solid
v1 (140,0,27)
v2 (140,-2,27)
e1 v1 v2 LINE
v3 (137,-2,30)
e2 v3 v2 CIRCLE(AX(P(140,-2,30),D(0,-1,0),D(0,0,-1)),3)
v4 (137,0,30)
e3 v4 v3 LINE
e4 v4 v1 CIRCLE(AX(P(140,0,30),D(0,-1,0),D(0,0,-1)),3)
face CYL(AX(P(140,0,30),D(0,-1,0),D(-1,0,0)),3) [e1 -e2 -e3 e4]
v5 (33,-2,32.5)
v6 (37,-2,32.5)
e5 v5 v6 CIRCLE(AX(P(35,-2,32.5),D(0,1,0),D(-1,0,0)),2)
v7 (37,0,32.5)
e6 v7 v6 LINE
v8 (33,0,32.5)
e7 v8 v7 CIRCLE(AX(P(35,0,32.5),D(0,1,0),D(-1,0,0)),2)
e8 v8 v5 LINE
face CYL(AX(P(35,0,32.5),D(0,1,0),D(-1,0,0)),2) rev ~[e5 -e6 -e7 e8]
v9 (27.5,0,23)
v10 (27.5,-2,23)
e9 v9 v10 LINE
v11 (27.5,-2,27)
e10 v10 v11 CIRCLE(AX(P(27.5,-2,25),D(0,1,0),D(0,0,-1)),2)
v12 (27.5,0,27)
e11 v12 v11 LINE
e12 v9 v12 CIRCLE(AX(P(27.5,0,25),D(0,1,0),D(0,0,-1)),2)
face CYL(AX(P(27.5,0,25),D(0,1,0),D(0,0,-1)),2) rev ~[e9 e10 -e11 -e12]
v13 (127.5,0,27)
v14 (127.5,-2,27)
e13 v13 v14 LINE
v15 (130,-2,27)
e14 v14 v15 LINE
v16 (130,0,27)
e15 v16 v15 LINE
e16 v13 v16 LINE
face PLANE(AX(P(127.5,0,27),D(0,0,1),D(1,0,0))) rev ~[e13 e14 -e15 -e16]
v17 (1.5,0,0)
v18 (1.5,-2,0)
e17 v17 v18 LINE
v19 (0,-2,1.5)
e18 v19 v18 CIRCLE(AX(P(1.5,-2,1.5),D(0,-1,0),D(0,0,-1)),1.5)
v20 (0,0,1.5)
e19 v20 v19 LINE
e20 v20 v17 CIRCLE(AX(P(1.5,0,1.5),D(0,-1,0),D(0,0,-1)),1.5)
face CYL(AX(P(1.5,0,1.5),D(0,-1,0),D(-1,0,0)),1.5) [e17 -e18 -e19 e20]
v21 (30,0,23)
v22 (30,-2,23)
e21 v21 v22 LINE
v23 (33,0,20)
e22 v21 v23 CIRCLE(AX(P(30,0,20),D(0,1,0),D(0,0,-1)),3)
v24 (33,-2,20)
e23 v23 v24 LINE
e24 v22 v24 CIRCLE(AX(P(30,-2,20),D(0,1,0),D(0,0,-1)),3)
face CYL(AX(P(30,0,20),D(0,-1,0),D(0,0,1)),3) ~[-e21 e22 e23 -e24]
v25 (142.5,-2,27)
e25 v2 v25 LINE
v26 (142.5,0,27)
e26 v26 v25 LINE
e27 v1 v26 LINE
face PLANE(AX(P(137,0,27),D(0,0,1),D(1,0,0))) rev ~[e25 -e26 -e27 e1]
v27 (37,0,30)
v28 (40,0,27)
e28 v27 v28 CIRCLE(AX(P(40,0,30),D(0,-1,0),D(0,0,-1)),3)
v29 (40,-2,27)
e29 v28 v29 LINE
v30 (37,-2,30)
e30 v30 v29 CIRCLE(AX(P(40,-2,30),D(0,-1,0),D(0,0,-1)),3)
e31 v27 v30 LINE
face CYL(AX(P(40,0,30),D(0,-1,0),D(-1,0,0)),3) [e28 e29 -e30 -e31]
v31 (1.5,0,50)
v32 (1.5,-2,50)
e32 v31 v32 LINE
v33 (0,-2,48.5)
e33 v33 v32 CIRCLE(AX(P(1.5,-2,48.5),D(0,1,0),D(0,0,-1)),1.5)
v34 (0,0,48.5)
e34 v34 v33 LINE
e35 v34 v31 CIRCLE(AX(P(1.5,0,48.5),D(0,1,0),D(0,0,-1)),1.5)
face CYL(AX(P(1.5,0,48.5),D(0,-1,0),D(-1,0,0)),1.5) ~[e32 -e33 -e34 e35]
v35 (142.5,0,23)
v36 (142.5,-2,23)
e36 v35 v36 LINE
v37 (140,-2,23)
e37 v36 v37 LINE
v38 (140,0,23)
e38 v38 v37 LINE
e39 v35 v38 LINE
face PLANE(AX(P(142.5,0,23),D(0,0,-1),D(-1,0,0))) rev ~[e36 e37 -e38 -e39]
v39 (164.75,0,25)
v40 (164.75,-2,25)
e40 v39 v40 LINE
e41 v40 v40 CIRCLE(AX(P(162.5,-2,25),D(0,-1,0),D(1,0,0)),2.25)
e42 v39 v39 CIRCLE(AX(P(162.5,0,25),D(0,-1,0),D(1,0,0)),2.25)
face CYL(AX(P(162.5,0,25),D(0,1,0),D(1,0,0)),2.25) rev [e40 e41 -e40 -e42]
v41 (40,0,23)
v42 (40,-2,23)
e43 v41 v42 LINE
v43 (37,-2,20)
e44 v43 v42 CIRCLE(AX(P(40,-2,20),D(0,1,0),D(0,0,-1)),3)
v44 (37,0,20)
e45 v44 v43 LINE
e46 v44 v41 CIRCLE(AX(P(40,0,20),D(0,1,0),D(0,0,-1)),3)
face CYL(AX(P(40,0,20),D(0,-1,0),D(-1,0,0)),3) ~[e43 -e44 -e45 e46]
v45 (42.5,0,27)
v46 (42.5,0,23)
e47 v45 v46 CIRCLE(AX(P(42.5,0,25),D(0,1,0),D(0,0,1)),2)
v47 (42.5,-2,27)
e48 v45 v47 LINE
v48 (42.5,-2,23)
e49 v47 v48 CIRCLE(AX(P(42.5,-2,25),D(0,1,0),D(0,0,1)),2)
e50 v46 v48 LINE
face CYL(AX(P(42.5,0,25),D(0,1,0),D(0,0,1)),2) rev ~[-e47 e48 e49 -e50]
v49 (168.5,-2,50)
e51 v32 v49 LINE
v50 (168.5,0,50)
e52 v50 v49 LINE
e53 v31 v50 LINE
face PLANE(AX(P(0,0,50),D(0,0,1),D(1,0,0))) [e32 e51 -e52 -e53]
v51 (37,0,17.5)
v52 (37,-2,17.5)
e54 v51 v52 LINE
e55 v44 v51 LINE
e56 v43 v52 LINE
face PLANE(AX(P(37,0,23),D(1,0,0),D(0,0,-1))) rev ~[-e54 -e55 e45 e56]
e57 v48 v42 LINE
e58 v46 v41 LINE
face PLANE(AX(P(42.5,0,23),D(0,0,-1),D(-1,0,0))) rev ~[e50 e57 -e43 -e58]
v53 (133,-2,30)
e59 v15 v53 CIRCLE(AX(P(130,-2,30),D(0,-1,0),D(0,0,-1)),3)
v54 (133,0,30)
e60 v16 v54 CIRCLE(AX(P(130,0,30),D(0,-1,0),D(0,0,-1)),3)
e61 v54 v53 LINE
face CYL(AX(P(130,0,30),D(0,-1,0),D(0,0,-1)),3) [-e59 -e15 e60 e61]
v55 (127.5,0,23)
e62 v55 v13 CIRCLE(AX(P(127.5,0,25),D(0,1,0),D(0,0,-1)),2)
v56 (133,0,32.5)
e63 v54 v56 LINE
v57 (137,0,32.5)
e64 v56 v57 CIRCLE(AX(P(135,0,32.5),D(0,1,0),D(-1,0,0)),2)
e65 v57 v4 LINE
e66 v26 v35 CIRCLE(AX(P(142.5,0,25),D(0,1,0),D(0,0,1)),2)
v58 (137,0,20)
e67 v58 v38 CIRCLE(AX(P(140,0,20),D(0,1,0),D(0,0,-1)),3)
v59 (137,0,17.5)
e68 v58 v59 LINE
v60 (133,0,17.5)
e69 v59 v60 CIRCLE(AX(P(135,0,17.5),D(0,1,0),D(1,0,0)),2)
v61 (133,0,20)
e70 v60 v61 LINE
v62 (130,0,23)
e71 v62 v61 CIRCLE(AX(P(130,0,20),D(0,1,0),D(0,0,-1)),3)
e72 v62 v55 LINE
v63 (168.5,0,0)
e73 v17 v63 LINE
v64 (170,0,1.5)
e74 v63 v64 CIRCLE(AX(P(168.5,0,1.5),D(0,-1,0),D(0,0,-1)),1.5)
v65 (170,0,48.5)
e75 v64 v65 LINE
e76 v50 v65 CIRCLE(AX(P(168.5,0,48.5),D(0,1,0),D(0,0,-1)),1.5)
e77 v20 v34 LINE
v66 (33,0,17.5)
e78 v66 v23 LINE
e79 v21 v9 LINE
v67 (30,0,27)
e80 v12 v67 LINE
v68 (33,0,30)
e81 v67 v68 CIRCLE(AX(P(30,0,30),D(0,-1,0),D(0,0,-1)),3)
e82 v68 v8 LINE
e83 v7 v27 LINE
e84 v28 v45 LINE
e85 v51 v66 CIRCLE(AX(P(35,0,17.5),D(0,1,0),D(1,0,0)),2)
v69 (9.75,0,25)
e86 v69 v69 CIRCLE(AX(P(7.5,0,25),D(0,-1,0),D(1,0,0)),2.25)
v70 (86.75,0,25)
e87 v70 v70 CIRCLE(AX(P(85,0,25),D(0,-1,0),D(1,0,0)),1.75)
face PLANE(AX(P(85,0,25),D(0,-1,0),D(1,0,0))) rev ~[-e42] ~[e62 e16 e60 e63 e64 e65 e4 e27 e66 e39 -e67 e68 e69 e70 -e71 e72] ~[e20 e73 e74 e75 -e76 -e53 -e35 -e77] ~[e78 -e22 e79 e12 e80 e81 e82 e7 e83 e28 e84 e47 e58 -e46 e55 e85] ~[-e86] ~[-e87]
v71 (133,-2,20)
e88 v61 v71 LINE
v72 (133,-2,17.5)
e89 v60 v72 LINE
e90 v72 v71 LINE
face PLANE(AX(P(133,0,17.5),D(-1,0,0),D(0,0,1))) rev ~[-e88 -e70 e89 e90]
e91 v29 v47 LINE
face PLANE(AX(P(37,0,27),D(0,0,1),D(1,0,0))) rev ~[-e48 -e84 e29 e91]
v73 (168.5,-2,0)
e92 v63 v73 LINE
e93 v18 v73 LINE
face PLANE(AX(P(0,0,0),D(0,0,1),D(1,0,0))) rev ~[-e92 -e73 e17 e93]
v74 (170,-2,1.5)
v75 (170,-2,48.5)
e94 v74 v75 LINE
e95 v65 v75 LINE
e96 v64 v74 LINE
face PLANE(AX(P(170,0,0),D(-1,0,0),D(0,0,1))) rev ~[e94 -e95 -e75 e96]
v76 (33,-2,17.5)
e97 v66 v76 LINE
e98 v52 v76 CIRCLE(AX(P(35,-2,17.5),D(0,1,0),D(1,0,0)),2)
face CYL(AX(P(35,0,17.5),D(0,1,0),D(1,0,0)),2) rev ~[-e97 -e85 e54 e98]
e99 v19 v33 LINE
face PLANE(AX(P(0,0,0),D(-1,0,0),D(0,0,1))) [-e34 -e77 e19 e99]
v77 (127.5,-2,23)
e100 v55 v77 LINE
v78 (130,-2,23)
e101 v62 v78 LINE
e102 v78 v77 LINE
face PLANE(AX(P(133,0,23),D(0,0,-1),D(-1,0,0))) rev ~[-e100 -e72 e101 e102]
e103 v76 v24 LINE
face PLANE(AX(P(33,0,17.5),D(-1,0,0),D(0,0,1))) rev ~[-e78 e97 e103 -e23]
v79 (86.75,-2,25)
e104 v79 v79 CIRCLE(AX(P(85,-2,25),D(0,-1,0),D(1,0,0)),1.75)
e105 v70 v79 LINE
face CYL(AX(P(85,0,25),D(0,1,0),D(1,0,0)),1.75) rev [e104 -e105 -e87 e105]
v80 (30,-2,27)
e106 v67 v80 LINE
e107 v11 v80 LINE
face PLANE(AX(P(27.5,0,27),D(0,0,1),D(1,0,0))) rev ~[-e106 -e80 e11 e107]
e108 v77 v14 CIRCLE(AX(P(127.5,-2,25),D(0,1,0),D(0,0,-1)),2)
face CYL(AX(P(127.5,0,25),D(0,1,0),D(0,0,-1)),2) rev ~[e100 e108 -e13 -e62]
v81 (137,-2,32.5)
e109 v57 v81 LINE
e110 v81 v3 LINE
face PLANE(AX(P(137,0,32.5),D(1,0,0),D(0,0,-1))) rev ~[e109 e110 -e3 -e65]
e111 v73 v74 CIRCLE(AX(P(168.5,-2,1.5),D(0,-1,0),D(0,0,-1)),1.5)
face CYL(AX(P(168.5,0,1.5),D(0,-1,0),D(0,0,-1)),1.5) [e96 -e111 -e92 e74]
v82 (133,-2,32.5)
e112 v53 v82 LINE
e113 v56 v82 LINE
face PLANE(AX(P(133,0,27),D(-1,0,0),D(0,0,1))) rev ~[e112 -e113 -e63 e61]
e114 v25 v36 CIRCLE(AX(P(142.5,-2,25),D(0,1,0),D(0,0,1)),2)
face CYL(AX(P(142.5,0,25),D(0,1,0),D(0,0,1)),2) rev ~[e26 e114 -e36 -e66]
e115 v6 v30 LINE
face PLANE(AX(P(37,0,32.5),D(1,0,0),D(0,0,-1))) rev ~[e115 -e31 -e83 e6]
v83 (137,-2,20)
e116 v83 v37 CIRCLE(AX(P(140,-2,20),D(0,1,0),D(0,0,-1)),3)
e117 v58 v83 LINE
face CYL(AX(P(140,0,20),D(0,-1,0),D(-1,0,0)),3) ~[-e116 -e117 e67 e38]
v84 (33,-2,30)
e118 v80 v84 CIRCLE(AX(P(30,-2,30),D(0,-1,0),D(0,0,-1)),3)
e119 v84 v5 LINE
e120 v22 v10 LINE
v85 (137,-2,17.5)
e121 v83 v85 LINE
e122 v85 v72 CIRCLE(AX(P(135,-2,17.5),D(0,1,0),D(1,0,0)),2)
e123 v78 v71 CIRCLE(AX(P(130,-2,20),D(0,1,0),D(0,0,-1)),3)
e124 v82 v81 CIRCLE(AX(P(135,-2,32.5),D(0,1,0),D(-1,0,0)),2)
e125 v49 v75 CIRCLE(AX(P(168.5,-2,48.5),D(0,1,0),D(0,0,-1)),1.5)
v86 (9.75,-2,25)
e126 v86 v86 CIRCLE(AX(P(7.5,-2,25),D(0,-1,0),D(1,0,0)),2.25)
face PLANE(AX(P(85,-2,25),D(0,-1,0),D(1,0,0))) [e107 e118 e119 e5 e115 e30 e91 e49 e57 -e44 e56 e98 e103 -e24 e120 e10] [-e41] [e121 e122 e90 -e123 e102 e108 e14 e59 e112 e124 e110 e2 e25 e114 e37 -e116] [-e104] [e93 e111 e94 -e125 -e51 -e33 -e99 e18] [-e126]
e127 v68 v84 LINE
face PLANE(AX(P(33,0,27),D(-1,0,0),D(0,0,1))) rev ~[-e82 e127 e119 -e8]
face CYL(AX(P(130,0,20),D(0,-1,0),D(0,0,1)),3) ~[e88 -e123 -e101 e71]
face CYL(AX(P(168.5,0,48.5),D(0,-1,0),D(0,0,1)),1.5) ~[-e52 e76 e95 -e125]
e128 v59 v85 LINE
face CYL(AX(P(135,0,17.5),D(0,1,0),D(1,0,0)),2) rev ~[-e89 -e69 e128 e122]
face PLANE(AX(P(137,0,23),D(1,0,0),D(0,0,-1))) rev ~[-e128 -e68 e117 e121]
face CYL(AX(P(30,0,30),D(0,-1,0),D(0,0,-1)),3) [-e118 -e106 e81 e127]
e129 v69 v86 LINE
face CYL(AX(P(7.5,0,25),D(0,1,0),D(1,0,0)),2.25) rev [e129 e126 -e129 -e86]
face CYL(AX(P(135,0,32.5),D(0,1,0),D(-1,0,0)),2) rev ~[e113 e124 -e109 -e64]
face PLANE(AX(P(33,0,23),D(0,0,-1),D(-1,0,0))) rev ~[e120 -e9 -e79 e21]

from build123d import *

# Parameters (mm, degrees)
F0_W     = 170
F0_H     = 50
F0_R     = 2.25
F0_R_2   = 1.75
F1_DEPTH = 2
F2_R     = 3
F3_R     = 1.5


# Not quite as in the source:
# - a feature names something its author has since deleted; it is built from what else it names


with BuildPart() as f1:
    # F0 (on Front) → F1 (new body)
    with BuildSketch(Plane.XZ):
        with Locations((85, 25)):
            Rectangle(F0_W, F0_H)
        with Locations((7.5, 25)):
            Circle(F0_R, mode=Mode.SUBTRACT)
        with BuildLine():
            Line((27.5, 27), (33, 27))
            Line((33, 27), (33, 32.5))
            ThreePointArc((33, 32.5), (35, 34.5), (37, 32.5))
            Line((37, 32.5), (37, 27))
            Line((37, 27), (42.5, 27))
            ThreePointArc((42.5, 27), (44.5, 25), (42.5, 23))
            Line((42.5, 23), (37, 23))
            Line((37, 23), (37, 17.5))
            ThreePointArc((37, 17.5), (35, 15.5), (33, 17.5))
            Line((33, 17.5), (33, 23))
            Line((33, 23), (27.5, 23))
            ThreePointArc((27.5, 23), (25.5, 25), (27.5, 27))
        make_face(mode=Mode.SUBTRACT)
        with Locations((85, 25)):
            Circle(F0_R_2, mode=Mode.SUBTRACT)
        with BuildLine():
            ThreePointArc((127.5, 23), (125.5, 25), (127.5, 27))
            Line((127.5, 27), (133, 27))
            Line((133, 27), (133, 32.5))
            ThreePointArc((133, 32.5), (135, 34.5), (137, 32.5))
            Line((137, 32.5), (137, 27))
            Line((137, 27), (142.5, 27))
            ThreePointArc((142.5, 27), (144.5, 25), (142.5, 23))
            Line((142.5, 23), (137, 23))
            Line((137, 23), (137, 17.5))
            ThreePointArc((137, 17.5), (135, 15.5), (133, 17.5))
            Line((133, 17.5), (133, 23))
            Line((133, 23), (127.5, 23))
        make_face(mode=Mode.SUBTRACT)
        with Locations((162.5, 25)):
            Circle(F0_R, mode=Mode.SUBTRACT)
    extrude(amount=F1_DEPTH)

    # F2
    f2_edges = [f1.edges().sort_by_distance(p)[0] for p in [
        (33, -1, 27),
        (37, -1, 27),
        (37, -1, 23),
        (33, -1, 23),
        (133, -1, 27),
        (133, -1, 23),
        (137, -1, 27),
        (137, -1, 23),
    ]]
    fillet(f2_edges, radius=F2_R)

    # F3
    f3_edges = [f1.edges().sort_by_distance(p)[0] for p in [
        (0, -1, 50),
        (0, -1, 0),
        (170, -1, 50),
        (170, -1, 0),
    ]]
    fillet(f3_edges, radius=F3_R)


solid = f1.part
